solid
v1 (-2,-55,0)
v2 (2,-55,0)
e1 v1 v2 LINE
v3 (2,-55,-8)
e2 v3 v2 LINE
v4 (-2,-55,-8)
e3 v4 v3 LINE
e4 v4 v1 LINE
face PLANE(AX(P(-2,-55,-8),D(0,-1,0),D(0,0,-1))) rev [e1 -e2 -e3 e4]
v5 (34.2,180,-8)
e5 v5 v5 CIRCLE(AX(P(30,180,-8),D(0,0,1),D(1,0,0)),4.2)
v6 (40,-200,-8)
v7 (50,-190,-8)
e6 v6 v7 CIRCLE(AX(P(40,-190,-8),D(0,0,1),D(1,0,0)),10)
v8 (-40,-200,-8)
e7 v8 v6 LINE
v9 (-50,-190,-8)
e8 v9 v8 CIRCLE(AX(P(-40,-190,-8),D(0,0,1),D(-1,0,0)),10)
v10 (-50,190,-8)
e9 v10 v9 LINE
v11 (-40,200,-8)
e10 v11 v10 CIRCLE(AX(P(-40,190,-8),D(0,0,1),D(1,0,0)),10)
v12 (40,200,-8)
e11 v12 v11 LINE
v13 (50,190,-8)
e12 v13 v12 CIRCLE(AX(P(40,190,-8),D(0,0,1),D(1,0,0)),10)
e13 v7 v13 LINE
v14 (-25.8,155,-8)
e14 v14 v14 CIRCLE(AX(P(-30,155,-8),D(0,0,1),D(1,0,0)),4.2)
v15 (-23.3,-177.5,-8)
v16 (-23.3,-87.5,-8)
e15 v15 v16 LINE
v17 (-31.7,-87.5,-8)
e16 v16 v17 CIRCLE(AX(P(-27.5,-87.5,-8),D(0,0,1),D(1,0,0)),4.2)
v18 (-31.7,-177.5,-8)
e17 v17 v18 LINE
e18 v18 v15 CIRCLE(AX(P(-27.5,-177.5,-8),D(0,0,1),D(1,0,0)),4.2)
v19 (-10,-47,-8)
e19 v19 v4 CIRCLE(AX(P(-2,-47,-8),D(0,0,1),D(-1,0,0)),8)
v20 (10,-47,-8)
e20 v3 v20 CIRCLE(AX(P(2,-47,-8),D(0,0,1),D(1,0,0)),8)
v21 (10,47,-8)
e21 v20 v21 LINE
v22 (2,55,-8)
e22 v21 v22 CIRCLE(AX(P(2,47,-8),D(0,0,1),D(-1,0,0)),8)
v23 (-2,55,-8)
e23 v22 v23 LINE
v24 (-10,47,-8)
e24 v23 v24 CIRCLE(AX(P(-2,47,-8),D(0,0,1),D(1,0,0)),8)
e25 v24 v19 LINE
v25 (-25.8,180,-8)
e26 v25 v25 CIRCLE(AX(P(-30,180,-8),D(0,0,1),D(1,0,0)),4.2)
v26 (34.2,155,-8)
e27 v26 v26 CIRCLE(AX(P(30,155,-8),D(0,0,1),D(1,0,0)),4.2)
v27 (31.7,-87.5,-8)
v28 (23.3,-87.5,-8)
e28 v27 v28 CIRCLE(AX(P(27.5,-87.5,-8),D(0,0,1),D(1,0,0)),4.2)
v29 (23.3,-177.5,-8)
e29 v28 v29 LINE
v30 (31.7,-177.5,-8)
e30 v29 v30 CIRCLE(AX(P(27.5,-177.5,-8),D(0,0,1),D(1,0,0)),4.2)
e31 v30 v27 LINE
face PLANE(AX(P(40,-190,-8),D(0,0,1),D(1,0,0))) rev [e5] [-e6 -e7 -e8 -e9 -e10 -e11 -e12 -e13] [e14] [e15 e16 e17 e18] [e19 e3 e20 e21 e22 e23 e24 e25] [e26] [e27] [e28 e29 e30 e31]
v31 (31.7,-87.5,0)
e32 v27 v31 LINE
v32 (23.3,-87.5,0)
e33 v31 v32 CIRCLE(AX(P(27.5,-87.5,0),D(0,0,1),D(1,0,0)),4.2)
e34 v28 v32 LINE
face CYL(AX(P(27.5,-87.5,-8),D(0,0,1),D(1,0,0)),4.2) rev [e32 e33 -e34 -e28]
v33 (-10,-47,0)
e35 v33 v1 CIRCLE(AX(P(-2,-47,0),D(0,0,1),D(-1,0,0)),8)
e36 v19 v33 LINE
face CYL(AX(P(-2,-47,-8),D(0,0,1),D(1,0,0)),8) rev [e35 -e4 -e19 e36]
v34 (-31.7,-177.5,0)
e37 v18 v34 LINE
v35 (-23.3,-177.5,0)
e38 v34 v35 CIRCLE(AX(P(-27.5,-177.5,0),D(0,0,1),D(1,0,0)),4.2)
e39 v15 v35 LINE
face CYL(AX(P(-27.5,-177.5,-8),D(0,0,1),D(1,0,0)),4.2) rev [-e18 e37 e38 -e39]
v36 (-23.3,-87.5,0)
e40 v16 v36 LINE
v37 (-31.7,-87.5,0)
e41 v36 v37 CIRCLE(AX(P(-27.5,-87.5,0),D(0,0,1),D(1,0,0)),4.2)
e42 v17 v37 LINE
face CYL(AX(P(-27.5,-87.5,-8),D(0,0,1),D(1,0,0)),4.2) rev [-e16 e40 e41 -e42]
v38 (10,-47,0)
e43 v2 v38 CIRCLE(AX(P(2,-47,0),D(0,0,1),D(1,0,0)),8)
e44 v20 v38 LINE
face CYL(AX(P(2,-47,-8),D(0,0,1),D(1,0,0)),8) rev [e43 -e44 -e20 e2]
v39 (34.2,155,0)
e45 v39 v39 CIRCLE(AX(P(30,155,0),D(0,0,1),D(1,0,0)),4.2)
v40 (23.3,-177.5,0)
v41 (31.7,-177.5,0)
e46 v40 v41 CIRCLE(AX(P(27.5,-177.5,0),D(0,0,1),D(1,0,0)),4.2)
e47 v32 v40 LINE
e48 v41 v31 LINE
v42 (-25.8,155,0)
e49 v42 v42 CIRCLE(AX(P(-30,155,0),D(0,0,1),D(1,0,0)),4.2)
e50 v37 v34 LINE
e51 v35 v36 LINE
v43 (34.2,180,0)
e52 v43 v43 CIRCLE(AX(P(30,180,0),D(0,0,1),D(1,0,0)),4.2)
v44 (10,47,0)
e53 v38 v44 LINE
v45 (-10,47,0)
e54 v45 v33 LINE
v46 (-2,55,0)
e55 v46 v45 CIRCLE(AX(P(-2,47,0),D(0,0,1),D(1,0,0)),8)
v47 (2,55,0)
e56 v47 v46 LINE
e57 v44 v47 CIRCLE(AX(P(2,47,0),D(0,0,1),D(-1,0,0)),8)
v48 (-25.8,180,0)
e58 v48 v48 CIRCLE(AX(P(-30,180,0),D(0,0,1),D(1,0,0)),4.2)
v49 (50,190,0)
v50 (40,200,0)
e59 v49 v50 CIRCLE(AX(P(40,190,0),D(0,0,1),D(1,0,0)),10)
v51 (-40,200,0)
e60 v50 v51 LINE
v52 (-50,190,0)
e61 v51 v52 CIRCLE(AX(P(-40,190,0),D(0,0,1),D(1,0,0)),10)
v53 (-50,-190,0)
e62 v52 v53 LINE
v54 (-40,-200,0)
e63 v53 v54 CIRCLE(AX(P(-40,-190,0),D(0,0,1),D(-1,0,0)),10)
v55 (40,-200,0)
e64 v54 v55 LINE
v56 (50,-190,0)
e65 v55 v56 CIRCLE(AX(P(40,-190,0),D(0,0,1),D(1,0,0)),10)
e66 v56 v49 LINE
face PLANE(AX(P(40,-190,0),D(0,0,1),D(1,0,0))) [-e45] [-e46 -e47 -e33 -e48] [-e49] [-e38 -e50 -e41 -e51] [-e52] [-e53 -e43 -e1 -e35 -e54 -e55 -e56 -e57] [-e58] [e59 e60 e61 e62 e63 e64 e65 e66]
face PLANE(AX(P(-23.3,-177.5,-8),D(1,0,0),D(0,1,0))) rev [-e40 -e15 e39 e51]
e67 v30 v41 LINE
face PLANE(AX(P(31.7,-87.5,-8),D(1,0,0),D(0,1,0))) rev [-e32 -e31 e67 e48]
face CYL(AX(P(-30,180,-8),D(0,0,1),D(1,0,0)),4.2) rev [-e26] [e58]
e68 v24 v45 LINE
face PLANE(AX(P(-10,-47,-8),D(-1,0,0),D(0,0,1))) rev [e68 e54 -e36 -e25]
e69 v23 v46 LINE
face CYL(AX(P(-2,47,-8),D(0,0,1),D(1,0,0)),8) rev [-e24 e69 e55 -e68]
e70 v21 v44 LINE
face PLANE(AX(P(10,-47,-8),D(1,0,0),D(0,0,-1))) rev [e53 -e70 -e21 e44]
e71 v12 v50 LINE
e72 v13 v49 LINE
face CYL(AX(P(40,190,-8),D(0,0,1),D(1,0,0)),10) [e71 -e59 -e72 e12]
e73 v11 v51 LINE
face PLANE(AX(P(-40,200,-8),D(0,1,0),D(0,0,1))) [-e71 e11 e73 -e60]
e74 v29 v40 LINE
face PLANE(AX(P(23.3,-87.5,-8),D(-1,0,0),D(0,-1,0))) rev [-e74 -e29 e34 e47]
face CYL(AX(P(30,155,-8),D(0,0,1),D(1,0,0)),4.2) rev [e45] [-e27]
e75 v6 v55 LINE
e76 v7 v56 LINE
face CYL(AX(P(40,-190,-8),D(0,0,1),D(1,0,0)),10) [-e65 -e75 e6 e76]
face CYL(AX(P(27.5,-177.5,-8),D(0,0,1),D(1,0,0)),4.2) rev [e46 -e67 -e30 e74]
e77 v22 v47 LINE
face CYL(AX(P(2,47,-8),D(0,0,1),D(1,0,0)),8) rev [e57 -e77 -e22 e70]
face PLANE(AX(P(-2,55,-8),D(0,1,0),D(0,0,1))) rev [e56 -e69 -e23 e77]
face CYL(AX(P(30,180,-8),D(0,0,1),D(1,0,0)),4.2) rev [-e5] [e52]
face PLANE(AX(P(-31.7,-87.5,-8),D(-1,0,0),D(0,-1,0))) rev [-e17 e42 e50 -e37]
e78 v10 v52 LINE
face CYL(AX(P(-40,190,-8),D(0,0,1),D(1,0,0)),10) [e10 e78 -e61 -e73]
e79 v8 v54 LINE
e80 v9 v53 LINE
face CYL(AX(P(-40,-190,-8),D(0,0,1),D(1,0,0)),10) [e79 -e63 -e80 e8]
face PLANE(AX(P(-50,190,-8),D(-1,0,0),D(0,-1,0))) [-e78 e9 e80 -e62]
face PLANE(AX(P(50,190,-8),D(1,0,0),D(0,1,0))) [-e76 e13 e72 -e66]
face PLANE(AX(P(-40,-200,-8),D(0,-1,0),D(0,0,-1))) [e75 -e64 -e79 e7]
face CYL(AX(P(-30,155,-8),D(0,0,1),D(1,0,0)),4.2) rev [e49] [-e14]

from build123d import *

# Parameters (mm, degrees)
SKETCH1_R          = 4.2
BASE_FLANGE1_DEPTH = 8


# Sheet-metal steps are written as plain solids
with BuildPart() as part:
    # Sketch1 → Base-Flange1 (new body)
    with BuildSketch(Plane.XY):
        with BuildLine():
            Line((-40, 200), (40, 200))
            ThreePointArc((40, 200), (47.071067812, 197.071067812), (50, 190))
            Line((50, 190), (50, -190))
            ThreePointArc((50, -190), (47.071067812, -197.071067812), (40, -200))
            Line((40, -200), (-40, -200))
            ThreePointArc((-40, -200), (-47.071067812, -197.071067812), (-50, -190))
            Line((-50, -190), (-50, 190))
            ThreePointArc((-50, 190), (-47.071067812, 197.071067812), (-40, 200))
        make_face()
        with Locations((30, 180)):
            Circle(SKETCH1_R, mode=Mode.SUBTRACT)
        with Locations((30, 155)):
            Circle(SKETCH1_R, mode=Mode.SUBTRACT)
        with Locations((-30, 180)):
            Circle(SKETCH1_R, mode=Mode.SUBTRACT)
        with Locations((-30, 155)):
            Circle(SKETCH1_R, mode=Mode.SUBTRACT)
        with BuildLine():
            Line((23.3, -87.5), (23.3, -177.5))
            ThreePointArc((23.3, -177.5), (27.5, -181.7), (31.7, -177.5))
            Line((31.7, -177.5), (31.7, -87.5))
            ThreePointArc((31.7, -87.5), (27.5, -83.3), (23.3, -87.5))
        make_face(mode=Mode.SUBTRACT)
        with BuildLine():
            Line((-23.3, -177.5), (-23.3, -87.5))
            ThreePointArc((-23.3, -87.5), (-27.5, -83.3), (-31.7, -87.5))
            Line((-31.7, -87.5), (-31.7, -177.5))
            ThreePointArc((-31.7, -177.5), (-27.5, -181.7), (-23.3, -177.5))
        make_face(mode=Mode.SUBTRACT)
        with BuildLine():
            Line((-2, -55), (2, -55))
            ThreePointArc((2, -55), (7.656854249, -52.656854249), (10, -47))
            Line((10, -47), (10, 47))
            ThreePointArc((10, 47), (7.656854249, 52.656854249), (2, 55))
            Line((2, 55), (-2, 55))
            ThreePointArc((-2, 55), (-7.656854249, 52.656854249), (-10, 47))
            Line((-10, 47), (-10, -47))
            ThreePointArc((-10, -47), (-7.656854249, -52.656854249), (-2, -55))
        make_face(mode=Mode.SUBTRACT)
    extrude(amount=-BASE_FLANGE1_DEPTH)


solid = part.part
